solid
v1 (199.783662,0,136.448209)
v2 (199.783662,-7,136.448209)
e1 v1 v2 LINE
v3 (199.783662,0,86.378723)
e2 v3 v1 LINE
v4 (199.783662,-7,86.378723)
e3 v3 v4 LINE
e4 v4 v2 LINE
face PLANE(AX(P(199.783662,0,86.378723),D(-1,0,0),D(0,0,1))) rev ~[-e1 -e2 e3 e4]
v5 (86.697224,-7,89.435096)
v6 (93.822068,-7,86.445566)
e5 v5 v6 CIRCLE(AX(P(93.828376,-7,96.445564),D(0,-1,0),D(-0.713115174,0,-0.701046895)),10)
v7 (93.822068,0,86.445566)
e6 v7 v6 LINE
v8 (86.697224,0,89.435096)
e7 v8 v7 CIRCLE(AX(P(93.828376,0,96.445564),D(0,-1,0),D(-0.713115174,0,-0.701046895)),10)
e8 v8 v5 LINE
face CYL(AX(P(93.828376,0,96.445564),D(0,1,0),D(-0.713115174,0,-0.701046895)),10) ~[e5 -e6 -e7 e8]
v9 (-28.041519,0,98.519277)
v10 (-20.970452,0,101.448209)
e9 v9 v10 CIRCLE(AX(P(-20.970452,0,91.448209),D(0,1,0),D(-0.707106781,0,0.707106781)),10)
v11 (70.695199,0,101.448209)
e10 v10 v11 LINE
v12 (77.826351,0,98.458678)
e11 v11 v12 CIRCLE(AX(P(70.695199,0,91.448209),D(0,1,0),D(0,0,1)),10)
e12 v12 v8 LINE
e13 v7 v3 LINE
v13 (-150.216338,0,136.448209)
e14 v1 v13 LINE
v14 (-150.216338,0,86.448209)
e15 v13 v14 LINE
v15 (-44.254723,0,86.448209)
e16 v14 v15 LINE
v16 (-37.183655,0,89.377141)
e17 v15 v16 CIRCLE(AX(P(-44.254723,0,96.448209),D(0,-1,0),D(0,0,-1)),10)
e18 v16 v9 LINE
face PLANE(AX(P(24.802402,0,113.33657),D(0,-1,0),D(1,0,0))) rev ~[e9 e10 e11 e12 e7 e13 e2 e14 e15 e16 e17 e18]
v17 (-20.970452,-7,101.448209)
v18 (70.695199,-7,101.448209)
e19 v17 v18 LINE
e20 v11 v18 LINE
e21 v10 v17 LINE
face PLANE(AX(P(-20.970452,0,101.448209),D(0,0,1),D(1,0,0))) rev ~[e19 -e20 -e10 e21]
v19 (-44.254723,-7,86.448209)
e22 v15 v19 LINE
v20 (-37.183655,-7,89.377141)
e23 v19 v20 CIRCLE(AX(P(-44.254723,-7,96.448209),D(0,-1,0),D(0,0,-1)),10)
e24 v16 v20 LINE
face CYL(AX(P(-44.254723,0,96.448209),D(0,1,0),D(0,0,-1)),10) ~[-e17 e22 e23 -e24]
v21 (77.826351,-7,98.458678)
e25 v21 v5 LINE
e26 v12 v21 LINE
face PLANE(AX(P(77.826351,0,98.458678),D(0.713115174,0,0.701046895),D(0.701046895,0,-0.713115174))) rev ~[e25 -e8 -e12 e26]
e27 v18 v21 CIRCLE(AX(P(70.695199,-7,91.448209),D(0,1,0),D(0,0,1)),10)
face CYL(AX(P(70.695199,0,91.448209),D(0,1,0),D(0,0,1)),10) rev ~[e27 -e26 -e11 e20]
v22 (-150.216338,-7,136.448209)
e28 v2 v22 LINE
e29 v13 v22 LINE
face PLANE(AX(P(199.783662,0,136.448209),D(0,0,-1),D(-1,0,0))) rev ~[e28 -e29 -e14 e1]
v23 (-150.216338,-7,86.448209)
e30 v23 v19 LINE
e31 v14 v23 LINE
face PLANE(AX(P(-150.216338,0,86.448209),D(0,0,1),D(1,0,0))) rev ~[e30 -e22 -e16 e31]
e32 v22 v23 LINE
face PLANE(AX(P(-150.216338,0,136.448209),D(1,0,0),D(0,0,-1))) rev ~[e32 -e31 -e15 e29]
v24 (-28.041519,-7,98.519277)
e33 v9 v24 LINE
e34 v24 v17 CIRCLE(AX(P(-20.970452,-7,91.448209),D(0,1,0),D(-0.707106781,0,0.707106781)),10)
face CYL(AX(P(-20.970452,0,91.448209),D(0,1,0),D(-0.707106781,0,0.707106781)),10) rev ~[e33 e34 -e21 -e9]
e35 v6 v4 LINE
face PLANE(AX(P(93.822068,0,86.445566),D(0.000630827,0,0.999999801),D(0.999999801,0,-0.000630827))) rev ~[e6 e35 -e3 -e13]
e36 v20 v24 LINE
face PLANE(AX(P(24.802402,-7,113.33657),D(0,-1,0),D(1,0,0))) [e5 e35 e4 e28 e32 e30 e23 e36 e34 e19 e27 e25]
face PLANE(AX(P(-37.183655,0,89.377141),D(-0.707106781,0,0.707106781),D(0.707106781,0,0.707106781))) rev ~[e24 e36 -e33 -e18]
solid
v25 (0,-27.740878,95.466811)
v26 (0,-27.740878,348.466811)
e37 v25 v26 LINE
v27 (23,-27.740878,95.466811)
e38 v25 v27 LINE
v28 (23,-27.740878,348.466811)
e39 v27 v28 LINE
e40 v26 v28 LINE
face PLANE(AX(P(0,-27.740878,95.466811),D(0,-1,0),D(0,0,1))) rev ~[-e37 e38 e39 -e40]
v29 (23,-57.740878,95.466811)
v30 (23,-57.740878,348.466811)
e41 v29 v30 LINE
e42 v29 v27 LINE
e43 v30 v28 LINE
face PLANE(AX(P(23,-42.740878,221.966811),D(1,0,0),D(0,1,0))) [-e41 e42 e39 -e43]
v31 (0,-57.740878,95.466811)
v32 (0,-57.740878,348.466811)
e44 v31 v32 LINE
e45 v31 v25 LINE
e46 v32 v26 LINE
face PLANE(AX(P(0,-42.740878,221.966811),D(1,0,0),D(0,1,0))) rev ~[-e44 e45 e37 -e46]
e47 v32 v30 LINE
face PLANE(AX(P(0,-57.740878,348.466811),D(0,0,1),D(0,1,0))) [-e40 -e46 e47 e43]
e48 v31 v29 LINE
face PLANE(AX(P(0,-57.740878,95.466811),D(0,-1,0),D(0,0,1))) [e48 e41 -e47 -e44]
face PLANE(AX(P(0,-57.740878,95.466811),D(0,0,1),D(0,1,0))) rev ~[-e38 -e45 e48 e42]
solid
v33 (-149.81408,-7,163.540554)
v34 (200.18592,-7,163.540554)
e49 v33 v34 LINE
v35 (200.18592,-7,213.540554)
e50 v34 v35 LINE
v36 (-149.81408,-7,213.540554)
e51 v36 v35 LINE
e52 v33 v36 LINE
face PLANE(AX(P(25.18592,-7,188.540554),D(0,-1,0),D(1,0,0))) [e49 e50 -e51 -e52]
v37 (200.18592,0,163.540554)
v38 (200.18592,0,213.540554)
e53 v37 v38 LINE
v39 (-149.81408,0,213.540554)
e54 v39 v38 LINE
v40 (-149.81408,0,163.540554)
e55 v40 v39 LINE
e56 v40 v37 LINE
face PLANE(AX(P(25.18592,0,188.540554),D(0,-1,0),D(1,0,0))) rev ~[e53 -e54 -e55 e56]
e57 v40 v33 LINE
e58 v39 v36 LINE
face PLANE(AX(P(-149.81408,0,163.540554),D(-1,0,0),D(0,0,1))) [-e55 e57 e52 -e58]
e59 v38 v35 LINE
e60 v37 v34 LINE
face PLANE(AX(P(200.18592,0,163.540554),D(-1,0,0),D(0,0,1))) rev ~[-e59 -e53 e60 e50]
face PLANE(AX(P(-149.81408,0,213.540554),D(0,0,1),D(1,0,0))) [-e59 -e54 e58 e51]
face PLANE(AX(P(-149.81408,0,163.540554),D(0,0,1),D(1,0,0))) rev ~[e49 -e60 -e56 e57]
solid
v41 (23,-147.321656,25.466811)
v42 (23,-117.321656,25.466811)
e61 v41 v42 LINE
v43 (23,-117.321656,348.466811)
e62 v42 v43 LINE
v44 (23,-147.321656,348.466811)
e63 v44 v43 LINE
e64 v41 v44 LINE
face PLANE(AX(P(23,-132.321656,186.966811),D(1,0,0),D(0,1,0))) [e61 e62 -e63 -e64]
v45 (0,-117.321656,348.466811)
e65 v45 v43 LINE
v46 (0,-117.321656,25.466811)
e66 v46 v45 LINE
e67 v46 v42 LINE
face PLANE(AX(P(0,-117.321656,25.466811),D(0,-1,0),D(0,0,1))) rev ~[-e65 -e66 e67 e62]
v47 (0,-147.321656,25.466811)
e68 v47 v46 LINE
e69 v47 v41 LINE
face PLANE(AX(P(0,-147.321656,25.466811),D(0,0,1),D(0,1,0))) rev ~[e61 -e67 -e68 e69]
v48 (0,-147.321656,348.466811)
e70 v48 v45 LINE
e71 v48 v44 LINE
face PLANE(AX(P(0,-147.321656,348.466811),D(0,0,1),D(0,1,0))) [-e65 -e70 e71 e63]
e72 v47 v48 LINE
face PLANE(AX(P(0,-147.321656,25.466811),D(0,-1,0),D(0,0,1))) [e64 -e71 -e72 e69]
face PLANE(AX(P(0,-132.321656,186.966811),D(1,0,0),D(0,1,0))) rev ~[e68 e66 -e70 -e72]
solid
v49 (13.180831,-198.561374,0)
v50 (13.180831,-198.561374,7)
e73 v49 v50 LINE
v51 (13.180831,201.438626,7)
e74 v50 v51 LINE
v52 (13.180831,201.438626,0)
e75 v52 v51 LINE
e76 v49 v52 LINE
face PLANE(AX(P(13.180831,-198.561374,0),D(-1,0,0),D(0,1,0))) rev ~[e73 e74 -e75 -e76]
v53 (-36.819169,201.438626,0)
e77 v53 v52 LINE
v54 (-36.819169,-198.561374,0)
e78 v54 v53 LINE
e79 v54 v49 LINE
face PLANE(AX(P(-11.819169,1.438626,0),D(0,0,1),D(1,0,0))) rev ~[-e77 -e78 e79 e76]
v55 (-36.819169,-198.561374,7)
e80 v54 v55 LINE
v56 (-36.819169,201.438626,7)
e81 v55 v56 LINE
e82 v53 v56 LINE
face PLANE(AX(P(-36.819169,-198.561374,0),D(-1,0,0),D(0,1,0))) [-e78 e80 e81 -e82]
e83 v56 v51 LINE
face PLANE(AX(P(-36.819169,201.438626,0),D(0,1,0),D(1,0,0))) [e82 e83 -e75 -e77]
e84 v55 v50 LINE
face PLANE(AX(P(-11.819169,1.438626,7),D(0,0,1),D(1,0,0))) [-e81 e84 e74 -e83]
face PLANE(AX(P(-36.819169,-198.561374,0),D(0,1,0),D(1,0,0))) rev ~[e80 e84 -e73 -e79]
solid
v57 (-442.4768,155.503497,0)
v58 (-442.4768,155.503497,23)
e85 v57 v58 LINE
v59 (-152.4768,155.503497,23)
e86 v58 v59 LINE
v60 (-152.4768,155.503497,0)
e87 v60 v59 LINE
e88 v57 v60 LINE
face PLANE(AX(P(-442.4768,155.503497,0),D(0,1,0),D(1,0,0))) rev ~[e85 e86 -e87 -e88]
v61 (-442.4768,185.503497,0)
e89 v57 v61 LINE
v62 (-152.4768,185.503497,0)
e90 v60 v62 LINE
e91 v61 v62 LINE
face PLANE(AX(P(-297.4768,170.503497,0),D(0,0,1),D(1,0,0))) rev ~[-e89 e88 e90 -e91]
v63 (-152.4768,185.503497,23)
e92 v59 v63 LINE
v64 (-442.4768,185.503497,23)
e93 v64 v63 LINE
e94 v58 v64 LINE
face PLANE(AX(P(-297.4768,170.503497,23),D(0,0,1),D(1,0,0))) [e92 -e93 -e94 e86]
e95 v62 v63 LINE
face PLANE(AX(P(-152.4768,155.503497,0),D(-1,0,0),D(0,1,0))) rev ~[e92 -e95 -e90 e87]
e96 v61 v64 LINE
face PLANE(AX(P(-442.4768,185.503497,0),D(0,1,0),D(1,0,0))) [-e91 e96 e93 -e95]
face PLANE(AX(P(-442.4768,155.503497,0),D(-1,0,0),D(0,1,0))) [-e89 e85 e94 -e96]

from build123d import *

# Parameters (mm, degrees)
F0_W     = 50
F0_H     = 400
F1_DEPTH = 7
F2_W     = 350
F2_H     = 50
F3_DEPTH = 7
F4_W     = 290
F4_H     = 30
F5_DEPTH = 23
F6_W     = 30
F6_H     = 253
F7_DEPTH = 23
F6_H_2   = 323


# Not quite as in the source:
# - a feature names something its author has since deleted; it is built from what else it names


with BuildPart() as f1:
    # F0 (on Top) → F1 (new body)
    with BuildSketch(Plane.XY):
        with Locations((-11.8191692954, 1.4386259147)):
            Rectangle(F0_W, F0_H)
    extrude(amount=F1_DEPTH)


with BuildPart() as f3:
    # F2 (on Front) → F3 (new body)
    with BuildSketch(Plane.XZ):
        with Locations((25.1859198511, 188.5405542329)):
            Rectangle(F2_W, F2_H)
    extrude(amount=F3_DEPTH)


with BuildPart() as f3b:
    # F2 (on Front) → F3, piece 2 (new body)
    with BuildSketch(Plane.XZ):
        with BuildLine():
            Line((199.7836618459, 136.4482086897), (-150.2163381541, 136.4482086897))
            Line((-150.2163381541, 136.4482086897), (-150.2163381541, 86.4482086897))
            Line((-150.2163381541, 86.4482086897), (-44.2547228372, 86.4482086897))
            ThreePointArc((-44.2547228372, 86.4482086897), (-40.4278885136, 87.2094133646), (-37.1836550254, 89.3771408778))
            Line((-37.1836550254, 89.3771408778), (-28.0415194017, 98.5192765016))
            ThreePointArc((-28.0415194017, 98.5192765016), (-24.7972859134, 100.6870040148), (-20.9704515898, 101.4482086897))
            Line((-20.9704515898, 101.4482086897), (70.6951992973, 101.4482086897))
            ThreePointArc((70.6951992973, 101.4482086897), (74.5614190603, 100.6705915024), (77.8263510358, 98.4586776385))
            Line((77.8263510358, 98.4586776385), (86.697224144, 89.4350955287))
            ThreePointArc((86.697224144, 89.4350955287), (89.9592474476, 87.2244015816), (93.8220676124, 86.4455664673))
            Line((93.8220676124, 86.4455664673), (199.7836618459, 86.3787230186))
            Line((199.7836618459, 86.3787230186), (199.7836618459, 136.4482086897))
        make_face()
    extrude(amount=F3_DEPTH)


with BuildPart() as f5:
    # F4 (on Top) → F5 (new body)
    with BuildSketch(Plane.XY):
        with Locations((-297.4768000841, 170.5034965277)):
            Rectangle(F4_W, F4_H)
    extrude(amount=F5_DEPTH)


with BuildPart() as f7:
    # F6 (on Right) → F7 (new body)
    with BuildSketch(Plane.YZ):
        with Locations((-42.7408777177, 221.9668109119)):
            Rectangle(F6_W, F6_H)
    extrude(amount=F7_DEPTH)


with BuildPart() as f7b:
    # F6 (on Right) → F7, piece 2 (new body)
    with BuildSketch(Plane.YZ):
        with Locations((-132.3216563463, 186.9668109119)):
            Rectangle(F6_W, F6_H_2)
    extrude(amount=F7_DEPTH)


solid = Compound([f1.part, f3.part, f3b.part, f5.part, f7.part, f7b.part])
